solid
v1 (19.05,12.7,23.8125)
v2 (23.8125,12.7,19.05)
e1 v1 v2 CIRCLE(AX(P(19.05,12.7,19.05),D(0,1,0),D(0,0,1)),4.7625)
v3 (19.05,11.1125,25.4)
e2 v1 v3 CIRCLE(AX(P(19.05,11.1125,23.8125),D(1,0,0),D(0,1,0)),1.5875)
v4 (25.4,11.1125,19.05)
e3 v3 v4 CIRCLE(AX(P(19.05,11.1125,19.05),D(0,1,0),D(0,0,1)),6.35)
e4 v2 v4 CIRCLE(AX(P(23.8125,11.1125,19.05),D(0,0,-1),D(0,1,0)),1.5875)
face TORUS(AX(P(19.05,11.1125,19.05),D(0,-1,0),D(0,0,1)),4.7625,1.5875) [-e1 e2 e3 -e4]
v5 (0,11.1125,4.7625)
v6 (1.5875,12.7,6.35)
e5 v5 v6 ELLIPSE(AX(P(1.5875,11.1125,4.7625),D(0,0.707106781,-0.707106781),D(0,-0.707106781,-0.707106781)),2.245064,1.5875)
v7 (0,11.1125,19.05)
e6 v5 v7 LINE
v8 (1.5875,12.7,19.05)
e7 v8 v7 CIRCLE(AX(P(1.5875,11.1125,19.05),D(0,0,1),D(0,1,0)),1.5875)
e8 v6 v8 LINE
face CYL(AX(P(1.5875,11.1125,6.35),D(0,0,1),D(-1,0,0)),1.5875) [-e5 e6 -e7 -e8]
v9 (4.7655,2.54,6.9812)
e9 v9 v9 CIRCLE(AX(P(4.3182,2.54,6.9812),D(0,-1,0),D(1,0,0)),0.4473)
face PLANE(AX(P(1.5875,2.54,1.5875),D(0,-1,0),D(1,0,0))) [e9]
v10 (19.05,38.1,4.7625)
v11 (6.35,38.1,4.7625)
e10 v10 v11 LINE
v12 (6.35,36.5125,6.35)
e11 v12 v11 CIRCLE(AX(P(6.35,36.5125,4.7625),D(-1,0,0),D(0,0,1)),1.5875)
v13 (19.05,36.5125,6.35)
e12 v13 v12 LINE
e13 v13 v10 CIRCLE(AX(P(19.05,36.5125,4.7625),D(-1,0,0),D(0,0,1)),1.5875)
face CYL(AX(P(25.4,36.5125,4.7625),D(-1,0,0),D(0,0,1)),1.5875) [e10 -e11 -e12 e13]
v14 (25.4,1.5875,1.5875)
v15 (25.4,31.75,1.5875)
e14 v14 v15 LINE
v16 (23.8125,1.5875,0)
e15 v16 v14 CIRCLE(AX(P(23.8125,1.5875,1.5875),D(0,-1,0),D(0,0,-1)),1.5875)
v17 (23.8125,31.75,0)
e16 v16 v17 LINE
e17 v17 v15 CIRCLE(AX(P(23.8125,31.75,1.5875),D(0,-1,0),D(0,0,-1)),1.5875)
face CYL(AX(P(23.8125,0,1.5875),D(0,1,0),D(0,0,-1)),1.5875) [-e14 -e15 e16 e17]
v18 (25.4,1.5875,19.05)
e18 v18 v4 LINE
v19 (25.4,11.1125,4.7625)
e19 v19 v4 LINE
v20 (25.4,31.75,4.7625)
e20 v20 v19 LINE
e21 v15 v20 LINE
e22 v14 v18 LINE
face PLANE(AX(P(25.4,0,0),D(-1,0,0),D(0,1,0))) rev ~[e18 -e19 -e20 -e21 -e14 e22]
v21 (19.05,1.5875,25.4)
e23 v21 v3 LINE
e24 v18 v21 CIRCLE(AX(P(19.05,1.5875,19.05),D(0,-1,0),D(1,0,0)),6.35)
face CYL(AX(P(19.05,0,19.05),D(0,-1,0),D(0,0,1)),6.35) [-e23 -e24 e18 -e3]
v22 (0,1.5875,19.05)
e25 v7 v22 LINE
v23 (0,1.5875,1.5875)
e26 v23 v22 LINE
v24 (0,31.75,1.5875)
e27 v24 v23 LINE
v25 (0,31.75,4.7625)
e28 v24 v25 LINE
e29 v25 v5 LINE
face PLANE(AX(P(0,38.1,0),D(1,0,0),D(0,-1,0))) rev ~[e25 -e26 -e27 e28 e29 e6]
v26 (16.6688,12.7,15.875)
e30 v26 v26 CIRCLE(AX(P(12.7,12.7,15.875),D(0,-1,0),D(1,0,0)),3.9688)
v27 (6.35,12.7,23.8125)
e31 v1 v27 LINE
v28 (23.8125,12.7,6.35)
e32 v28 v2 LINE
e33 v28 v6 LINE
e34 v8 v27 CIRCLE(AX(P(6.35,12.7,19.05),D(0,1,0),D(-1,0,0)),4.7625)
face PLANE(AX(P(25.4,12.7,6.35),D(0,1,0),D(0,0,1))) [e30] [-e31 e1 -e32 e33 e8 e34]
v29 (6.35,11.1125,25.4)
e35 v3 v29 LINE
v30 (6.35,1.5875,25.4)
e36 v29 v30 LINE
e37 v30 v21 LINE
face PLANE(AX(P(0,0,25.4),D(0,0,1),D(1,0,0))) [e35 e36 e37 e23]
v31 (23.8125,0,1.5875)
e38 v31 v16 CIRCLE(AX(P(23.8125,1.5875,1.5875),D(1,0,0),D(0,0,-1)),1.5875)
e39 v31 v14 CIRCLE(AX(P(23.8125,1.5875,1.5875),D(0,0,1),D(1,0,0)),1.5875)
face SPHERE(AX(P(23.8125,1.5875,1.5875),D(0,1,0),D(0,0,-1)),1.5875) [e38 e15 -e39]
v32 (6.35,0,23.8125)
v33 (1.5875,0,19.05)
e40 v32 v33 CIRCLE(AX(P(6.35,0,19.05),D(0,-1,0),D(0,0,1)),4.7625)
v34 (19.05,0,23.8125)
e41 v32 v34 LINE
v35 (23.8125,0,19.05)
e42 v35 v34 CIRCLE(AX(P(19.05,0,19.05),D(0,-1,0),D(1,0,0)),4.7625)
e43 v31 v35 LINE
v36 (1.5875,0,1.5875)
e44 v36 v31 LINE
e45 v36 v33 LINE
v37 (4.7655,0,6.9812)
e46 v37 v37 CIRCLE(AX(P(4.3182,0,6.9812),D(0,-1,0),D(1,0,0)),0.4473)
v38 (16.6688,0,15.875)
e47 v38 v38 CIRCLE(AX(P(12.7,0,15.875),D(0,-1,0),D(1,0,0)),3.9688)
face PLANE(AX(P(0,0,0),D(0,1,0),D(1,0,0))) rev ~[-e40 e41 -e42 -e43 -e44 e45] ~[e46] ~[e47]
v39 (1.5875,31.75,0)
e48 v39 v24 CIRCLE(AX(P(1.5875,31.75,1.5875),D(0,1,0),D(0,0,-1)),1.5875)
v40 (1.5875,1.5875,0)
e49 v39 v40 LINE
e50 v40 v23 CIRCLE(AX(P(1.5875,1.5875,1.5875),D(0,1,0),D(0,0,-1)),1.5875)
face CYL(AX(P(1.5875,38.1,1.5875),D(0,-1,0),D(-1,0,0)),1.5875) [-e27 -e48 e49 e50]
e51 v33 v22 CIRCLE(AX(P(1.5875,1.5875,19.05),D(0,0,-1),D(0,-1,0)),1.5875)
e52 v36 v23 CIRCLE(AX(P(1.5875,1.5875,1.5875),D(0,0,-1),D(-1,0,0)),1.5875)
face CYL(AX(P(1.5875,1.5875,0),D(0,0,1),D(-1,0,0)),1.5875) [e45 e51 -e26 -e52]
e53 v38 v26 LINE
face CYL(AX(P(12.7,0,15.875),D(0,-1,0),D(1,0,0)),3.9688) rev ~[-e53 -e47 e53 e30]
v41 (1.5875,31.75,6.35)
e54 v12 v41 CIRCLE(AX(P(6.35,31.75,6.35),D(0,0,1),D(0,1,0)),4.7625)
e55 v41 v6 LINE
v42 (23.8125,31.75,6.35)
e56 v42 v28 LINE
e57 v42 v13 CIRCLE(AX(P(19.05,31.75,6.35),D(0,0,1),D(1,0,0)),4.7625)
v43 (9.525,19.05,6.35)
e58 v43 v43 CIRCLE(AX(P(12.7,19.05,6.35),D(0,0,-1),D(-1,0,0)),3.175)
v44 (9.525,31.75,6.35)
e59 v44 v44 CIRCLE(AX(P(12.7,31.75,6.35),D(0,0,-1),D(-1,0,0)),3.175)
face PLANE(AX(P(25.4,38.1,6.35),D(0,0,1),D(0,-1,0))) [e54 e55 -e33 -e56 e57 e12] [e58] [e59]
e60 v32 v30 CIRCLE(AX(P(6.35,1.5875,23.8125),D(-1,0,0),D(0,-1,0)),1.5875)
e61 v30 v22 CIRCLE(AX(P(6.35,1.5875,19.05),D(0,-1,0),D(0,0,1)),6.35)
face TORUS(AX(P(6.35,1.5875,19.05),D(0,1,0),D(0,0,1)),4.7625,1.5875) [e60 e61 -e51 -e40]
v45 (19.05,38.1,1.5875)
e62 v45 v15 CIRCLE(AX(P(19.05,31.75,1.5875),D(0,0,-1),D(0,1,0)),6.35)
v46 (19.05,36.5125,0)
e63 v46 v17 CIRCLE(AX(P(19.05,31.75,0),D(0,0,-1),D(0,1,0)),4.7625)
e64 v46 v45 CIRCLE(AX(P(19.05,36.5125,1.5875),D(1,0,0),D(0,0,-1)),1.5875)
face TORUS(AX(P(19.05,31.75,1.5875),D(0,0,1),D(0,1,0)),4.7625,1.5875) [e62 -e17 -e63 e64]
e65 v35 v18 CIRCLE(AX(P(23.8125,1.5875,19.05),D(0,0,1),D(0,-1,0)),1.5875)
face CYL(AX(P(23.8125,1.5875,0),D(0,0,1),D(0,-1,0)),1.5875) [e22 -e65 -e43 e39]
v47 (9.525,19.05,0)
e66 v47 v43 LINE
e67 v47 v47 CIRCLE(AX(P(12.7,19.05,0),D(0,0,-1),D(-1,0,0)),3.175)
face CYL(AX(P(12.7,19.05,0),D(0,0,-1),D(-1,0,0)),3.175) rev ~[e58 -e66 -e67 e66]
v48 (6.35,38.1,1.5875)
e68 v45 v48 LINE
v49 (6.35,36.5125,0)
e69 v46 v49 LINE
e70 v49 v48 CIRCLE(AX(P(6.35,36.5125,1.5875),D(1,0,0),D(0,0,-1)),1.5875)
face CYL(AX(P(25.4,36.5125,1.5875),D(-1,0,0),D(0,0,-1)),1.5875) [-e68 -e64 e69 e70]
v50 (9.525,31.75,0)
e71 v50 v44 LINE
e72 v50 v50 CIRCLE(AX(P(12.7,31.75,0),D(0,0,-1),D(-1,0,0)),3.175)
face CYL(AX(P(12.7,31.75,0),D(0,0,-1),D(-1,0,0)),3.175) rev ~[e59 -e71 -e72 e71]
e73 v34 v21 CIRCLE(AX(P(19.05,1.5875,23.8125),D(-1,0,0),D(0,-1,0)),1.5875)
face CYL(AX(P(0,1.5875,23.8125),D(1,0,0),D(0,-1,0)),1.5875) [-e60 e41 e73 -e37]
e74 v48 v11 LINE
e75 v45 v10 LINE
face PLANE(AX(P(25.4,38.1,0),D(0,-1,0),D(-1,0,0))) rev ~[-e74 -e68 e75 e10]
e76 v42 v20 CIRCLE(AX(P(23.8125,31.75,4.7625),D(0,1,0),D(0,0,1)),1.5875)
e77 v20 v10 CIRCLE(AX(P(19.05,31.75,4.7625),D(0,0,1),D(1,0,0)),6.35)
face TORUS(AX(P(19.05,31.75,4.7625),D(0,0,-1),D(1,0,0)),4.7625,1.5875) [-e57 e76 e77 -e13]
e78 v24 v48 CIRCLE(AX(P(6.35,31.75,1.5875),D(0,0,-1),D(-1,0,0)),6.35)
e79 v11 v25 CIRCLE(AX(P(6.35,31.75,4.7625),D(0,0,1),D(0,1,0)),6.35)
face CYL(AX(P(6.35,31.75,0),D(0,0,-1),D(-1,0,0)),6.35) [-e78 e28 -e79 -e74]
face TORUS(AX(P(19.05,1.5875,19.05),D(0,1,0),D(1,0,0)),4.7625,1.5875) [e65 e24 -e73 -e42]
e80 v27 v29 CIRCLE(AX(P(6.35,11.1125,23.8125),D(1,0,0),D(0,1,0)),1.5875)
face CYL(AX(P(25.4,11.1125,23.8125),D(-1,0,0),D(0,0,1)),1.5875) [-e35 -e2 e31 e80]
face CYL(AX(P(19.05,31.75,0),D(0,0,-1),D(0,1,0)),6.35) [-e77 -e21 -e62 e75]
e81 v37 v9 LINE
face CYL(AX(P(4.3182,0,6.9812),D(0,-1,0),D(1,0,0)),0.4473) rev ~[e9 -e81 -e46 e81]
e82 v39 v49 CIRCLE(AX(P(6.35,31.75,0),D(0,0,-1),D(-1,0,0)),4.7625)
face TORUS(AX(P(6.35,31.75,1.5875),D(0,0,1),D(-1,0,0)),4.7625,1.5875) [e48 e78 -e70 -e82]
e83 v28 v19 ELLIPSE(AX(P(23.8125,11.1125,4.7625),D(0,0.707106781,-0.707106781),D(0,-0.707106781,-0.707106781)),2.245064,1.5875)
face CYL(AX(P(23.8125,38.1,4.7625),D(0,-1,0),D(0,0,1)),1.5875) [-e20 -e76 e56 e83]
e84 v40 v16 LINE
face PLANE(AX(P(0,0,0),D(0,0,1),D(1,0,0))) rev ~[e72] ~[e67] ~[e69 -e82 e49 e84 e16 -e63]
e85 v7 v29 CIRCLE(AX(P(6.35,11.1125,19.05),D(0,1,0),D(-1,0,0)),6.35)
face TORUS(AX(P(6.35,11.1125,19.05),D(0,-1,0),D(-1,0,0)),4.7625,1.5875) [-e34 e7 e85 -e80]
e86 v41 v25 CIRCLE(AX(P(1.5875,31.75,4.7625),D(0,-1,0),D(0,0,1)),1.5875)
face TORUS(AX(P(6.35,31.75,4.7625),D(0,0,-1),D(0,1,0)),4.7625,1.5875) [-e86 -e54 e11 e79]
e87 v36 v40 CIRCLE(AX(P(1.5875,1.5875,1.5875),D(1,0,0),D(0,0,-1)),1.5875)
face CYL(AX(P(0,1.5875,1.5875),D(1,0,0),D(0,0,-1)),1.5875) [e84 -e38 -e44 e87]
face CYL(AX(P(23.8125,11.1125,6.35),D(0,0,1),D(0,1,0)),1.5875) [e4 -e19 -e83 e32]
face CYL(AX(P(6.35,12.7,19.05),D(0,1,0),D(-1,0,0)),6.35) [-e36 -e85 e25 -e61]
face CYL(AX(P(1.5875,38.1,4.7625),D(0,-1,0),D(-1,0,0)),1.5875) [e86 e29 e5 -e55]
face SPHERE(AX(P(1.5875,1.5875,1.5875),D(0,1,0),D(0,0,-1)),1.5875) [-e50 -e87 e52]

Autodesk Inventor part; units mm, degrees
ref_plane "YZ Plane" through (0, 0, 0) normal (1, 0, 0) x (0, 1, 0)
ref_plane "XZ Plane" through (0, 0, 0) normal (0, 1, 0) x (-1, 0, 0)
ref_plane "XY Plane" through (0, 0, 0) normal (0, 0, 1) x (1, 0, 0)
sketch "Sketch1" plane through (0, 0, 0) normal (0, 0, 1) x (1, 0, 0)
  line L0 (0, 0) -> (25.4, 0)
  line L1 (25.4, 0) -> (25.4, 38.1)
  line L2 (25.4, 38.1) -> (0, 38.1)
  line L3 (0, 38.1) -> (0, 0)
  dimension "d0" = 38.1
  dimension "d1" = 25.4
extrude "Extrusion1" add sketch "Sketch1" along normal blind 25.4
sketch "Sketch4" plane through (25.4, 0, 0) normal (1, 0, 0) x (0, 0, -1)
  line L0 (0, 0) -> (-25.4, 0) projected
  line L1 (0, 0) -> (0, 38.1) projected
  line L2 (-25.4, 38.1) -> (-6.35, 38.1)
  line L3 (-6.35, 38.1) -> (-6.35, 12.7)
  line L4 (-6.35, 12.7) -> (-25.4, 12.7)
  line L5 (-25.4, 12.7) -> (-25.4, 38.1)
  dimension "d23" = 6.35
  dimension "d24" = 12.7
extrude "Extrusion4" cut sketch "Sketch4" against normal through all
sketch "Sketch3" plane through (0, 0, 0) normal (0, 0, -1) x (-1, 0, 0)
  line L0 (-25.4, 38.1) -> (0, 38.1) projected
  line L1 (-25.4, 0) -> (-25.4, 38.1) projected
  circle A0 centre (-12.7, 31.75) radius 3.175
  circle A1 centre (-12.7, 19.05) radius 3.175
  dimension "d11" = 6.35
  dimension "d12" = 6.35
  dimension "d13" = 12.7
  dimension "d14" = 12.7
  dimension "d22" = 12.7
extrude "Extrusion3" cut sketch "Sketch3" against normal through all
sketch "Sketch5" plane through (0, 0, 0) normal (0, -1, 0) x (1, 0, 0)
  line L0 (25.4, 25.4) -> (0, 25.4) projected
  line L1 (25.4, 0) -> (25.4, 25.4) projected
  circle A0 centre (12.7, 15.875) radius 3.9688
  dimension "d27" = 9.525
  dimension "d28" = 7.9375
  dimension "d29" = 12.7
extrude "Extrusion5" cut sketch "Sketch5" against normal up to next
fillet "Fillet4" radius 1.5875 13 edges at (12.7, 38.1, 6.35) (12.7, 38.1, 0) (0, 25.4, 6.35) (0, 19.05, 0) (25.4, 25.4, 6.35) (25.4, 19.05, 0) (12.7, 0, 0) (25.4, 0, 12.7) (0, 0, 12.7) (25.4, 12.7, 15.875) (0, 12.7, 15.875) (12.7, 12.7, 25.4) (12.7, 0, 25.4)
fillet "Fillet5" radius 6.35 12 edges at (0.465, 12.235, 24.935) (0.465, 0.465, 24.935) (0, 6.35, 25.4) (24.935, 0.465, 24.935) (24.935, 12.235, 24.935) (25.4, 6.35, 25.4) (0.465, 37.635, 5.885) (0.465, 37.635, 0.465) (0, 38.1, 3.175) (24.935, 37.635, 5.885) (24.935, 37.635, 0.465) (25.4, 38.1, 3.175)
sketch "Sketch6" plane through (1.5875, 0, 1.5875) normal (0, -1, 0) x (1, 0, 0)
  circle A0 centre (2.7307, 5.3937) radius 0.4473
  point P0 (-1.5875, -1.5875)
extrude "Extrusion6" cut sketch "Sketch6" against normal blind 2.54
properties part number "MainLiftBlock" material "Aluminum-6061"
